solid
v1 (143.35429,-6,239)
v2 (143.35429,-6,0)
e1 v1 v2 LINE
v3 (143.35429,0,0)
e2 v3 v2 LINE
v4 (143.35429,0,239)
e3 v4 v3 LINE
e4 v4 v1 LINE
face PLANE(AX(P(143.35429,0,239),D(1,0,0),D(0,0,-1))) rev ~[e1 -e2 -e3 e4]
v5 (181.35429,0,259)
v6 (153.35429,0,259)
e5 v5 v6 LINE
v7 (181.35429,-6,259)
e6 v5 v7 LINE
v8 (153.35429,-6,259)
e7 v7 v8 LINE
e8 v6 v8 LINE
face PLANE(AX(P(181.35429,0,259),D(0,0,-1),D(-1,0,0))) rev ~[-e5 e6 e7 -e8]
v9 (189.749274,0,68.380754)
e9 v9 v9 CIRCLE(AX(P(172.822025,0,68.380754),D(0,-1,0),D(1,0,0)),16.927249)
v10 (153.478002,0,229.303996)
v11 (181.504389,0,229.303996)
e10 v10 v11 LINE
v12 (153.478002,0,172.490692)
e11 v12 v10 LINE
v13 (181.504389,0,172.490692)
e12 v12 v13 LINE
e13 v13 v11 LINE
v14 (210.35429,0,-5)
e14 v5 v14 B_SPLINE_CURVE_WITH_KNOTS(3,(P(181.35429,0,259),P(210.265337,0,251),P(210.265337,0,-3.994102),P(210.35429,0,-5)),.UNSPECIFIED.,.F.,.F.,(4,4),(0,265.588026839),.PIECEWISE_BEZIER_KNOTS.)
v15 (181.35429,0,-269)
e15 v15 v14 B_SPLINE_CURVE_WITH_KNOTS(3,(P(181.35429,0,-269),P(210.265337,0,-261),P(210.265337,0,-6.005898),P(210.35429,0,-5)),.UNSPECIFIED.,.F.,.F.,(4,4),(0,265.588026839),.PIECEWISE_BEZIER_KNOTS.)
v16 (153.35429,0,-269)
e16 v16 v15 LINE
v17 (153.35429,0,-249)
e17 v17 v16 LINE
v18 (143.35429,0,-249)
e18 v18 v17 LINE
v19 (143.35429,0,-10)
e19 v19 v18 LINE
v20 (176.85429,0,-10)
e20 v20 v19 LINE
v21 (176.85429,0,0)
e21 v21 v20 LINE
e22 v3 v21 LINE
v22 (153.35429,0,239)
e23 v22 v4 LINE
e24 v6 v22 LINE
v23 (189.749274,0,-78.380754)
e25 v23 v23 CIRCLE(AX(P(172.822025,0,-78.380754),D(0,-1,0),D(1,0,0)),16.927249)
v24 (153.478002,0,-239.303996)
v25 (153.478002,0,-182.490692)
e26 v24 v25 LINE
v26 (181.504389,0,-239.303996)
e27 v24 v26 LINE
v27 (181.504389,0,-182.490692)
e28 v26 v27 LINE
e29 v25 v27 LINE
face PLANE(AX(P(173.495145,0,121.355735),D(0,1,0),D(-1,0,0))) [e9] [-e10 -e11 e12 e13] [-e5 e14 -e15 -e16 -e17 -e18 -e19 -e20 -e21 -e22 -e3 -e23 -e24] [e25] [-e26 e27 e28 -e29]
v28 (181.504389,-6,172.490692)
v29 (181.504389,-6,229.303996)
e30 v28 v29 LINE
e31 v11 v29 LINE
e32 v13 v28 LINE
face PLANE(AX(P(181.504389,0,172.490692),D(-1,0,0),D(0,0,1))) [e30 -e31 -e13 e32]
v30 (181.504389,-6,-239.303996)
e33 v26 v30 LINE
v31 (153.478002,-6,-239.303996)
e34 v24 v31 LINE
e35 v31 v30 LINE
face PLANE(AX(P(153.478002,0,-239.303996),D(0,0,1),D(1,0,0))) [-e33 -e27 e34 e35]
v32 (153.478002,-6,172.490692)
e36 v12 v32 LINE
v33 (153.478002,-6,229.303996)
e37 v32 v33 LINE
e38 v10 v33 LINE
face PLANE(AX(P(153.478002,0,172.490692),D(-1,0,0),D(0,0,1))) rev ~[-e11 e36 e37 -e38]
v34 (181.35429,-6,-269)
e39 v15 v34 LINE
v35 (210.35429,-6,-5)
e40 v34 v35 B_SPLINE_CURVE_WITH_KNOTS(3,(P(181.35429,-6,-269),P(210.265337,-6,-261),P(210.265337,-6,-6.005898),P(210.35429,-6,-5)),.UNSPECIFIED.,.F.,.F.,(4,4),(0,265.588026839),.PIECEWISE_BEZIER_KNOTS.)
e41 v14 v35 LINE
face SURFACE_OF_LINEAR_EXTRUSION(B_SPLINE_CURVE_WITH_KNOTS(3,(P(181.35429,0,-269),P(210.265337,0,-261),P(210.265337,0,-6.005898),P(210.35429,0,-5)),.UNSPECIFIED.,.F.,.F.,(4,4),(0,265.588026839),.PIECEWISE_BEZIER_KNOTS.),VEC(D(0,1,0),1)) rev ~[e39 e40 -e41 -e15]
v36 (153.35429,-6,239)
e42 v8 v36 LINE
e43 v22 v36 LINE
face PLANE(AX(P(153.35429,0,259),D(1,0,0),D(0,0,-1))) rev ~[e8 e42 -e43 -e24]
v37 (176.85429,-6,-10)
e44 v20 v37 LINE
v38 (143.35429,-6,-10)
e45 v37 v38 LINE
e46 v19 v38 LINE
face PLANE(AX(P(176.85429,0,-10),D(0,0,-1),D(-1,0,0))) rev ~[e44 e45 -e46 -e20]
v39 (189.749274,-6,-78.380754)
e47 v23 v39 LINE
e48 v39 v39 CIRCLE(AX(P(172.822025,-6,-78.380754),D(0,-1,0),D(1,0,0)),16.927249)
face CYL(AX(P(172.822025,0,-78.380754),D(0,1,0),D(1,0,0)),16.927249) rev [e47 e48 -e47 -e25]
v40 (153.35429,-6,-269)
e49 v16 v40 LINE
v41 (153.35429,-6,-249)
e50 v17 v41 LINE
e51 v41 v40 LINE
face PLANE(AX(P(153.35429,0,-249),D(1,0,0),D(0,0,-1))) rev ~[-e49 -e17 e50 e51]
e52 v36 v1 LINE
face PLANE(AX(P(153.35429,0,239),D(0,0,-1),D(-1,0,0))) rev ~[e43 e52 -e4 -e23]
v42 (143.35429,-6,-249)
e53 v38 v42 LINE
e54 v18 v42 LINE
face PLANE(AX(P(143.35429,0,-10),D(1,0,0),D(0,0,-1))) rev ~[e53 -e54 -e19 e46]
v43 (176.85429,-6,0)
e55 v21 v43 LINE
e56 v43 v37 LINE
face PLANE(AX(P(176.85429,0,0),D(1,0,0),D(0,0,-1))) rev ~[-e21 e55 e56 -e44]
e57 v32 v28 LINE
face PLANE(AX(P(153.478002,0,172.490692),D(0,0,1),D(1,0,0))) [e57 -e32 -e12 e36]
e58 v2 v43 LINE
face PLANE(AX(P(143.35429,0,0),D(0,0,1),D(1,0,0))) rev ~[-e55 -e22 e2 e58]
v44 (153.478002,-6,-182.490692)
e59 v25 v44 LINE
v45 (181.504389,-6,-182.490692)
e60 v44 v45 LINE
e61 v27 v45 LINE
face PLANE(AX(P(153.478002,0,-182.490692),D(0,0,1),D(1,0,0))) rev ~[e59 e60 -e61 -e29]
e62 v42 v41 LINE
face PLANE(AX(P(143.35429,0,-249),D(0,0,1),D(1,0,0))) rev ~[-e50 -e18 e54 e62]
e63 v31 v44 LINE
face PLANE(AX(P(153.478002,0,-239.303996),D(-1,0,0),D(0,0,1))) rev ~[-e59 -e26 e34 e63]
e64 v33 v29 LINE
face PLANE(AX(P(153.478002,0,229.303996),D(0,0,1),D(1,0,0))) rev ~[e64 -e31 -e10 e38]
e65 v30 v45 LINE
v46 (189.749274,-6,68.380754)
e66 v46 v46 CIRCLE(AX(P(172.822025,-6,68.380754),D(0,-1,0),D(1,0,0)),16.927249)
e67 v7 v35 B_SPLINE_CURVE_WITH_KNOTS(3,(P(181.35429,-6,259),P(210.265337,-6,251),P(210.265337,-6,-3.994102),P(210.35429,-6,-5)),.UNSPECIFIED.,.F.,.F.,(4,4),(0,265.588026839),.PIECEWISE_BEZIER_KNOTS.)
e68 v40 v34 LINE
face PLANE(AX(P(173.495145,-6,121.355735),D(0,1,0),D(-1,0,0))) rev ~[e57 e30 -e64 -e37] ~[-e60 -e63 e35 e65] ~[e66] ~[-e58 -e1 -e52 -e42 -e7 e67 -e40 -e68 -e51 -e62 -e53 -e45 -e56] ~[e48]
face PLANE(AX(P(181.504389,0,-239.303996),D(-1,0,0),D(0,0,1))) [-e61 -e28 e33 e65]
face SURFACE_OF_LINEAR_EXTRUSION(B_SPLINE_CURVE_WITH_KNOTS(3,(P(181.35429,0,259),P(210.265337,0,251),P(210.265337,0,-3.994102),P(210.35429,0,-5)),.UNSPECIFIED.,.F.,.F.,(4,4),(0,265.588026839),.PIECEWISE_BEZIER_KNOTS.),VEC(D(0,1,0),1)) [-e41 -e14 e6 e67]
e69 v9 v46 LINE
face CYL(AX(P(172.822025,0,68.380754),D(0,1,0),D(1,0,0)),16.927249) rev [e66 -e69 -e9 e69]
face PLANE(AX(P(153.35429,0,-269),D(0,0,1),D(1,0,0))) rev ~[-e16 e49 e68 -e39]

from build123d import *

# Parameters (mm, degrees)
F0_R     = 16.9272487263
F0_W     = 28.0263870955
F0_H     = 56.8133033812
F1_DEPTH = 6


# Not quite as in the source:
# - a feature names something its author has since deleted; it is built from what else it names


with BuildPart() as f1:
    # F0 (on Front) → F1 (new body)
    with BuildSketch(Plane.XZ):
        with BuildLine():
            add(Edge.make_bspline(
                [(181.3542903333, 259), (206.5942975175, 252.0158164026), (209.7991991798, 56.7803677557), (210.2653369369, 6.6428164877)],
                knots=[0, 0, 0, 0, 231.86444259, 231.86444259, 231.86444259, 231.86444259], degree=3))
            Line((181.3542903333, 259), (153.3542903333, 259))
            Line((153.3542903333, 259), (153.3542903333, 239))
            Line((153.3542903333, 239), (143.3542903333, 239))
            Line((143.3542903333, 239), (143.3542903333, 0))
            Line((143.3542903333, 0), (176.8542903333, 0))
            Line((176.8542903333, 0), (176.8542903333, -5))
            Line((176.8542903333, -5), (210.3542903333, -5))
            add(Edge.make_bspline(
                [(210.2653369369, 6.6428164877), (210.3331344644, -0.6494527163), (210.3429952934, -4.8722740171), (210.3542903333, -5)],
                knots=[231.86444259, 231.86444259, 231.86444259, 231.86444259, 265.5880268386, 265.5880268386, 265.5880268386, 265.5880268386], degree=3))
        make_face()
        with Locations((172.8220252337, 68.3807536824)):
            Circle(F0_R, mode=Mode.SUBTRACT)
        with Locations((167.491195113, 200.8973438895)):
            Rectangle(F0_W, F0_H, mode=Mode.SUBTRACT)
        with BuildLine():
            add(Edge.make_bspline(
                [(210.2653369369, -16.6428164877), (210.3331344644, -9.3505472837), (210.3429952934, -5.1277259829), (210.3542903333, -5)],
                knots=[231.86444259, 231.86444259, 231.86444259, 231.86444259, 265.5880268386, 265.5880268386, 265.5880268386, 265.5880268386], degree=3))
            Line((210.3542903333, -5), (176.8542903333, -5))
            Line((176.8542903333, -5), (176.8542903333, -10))
            Line((176.8542903333, -10), (143.3542903333, -10))
            Line((143.3542903333, -10), (143.3542903333, -249))
            Line((143.3542903333, -249), (153.3542903333, -249))
            Line((153.3542903333, -249), (153.3542903333, -269))
            Line((153.3542903333, -269), (181.3542903333, -269))
            add(Edge.make_bspline(
                [(181.3542903333, -269), (206.5942975175, -262.0158164026), (209.7991991798, -66.7803677557), (210.2653369369, -16.6428164877)],
                knots=[0, 0, 0, 0, 231.86444259, 231.86444259, 231.86444259, 231.86444259], degree=3))
        make_face()
        with Locations((167.491195113, -210.8973438895)):
            Rectangle(F0_W, F0_H, mode=Mode.SUBTRACT)
        with Locations((172.8220252337, -78.3807536824)):
            Circle(F0_R, mode=Mode.SUBTRACT)
    extrude(amount=F1_DEPTH)


solid = f1.part
